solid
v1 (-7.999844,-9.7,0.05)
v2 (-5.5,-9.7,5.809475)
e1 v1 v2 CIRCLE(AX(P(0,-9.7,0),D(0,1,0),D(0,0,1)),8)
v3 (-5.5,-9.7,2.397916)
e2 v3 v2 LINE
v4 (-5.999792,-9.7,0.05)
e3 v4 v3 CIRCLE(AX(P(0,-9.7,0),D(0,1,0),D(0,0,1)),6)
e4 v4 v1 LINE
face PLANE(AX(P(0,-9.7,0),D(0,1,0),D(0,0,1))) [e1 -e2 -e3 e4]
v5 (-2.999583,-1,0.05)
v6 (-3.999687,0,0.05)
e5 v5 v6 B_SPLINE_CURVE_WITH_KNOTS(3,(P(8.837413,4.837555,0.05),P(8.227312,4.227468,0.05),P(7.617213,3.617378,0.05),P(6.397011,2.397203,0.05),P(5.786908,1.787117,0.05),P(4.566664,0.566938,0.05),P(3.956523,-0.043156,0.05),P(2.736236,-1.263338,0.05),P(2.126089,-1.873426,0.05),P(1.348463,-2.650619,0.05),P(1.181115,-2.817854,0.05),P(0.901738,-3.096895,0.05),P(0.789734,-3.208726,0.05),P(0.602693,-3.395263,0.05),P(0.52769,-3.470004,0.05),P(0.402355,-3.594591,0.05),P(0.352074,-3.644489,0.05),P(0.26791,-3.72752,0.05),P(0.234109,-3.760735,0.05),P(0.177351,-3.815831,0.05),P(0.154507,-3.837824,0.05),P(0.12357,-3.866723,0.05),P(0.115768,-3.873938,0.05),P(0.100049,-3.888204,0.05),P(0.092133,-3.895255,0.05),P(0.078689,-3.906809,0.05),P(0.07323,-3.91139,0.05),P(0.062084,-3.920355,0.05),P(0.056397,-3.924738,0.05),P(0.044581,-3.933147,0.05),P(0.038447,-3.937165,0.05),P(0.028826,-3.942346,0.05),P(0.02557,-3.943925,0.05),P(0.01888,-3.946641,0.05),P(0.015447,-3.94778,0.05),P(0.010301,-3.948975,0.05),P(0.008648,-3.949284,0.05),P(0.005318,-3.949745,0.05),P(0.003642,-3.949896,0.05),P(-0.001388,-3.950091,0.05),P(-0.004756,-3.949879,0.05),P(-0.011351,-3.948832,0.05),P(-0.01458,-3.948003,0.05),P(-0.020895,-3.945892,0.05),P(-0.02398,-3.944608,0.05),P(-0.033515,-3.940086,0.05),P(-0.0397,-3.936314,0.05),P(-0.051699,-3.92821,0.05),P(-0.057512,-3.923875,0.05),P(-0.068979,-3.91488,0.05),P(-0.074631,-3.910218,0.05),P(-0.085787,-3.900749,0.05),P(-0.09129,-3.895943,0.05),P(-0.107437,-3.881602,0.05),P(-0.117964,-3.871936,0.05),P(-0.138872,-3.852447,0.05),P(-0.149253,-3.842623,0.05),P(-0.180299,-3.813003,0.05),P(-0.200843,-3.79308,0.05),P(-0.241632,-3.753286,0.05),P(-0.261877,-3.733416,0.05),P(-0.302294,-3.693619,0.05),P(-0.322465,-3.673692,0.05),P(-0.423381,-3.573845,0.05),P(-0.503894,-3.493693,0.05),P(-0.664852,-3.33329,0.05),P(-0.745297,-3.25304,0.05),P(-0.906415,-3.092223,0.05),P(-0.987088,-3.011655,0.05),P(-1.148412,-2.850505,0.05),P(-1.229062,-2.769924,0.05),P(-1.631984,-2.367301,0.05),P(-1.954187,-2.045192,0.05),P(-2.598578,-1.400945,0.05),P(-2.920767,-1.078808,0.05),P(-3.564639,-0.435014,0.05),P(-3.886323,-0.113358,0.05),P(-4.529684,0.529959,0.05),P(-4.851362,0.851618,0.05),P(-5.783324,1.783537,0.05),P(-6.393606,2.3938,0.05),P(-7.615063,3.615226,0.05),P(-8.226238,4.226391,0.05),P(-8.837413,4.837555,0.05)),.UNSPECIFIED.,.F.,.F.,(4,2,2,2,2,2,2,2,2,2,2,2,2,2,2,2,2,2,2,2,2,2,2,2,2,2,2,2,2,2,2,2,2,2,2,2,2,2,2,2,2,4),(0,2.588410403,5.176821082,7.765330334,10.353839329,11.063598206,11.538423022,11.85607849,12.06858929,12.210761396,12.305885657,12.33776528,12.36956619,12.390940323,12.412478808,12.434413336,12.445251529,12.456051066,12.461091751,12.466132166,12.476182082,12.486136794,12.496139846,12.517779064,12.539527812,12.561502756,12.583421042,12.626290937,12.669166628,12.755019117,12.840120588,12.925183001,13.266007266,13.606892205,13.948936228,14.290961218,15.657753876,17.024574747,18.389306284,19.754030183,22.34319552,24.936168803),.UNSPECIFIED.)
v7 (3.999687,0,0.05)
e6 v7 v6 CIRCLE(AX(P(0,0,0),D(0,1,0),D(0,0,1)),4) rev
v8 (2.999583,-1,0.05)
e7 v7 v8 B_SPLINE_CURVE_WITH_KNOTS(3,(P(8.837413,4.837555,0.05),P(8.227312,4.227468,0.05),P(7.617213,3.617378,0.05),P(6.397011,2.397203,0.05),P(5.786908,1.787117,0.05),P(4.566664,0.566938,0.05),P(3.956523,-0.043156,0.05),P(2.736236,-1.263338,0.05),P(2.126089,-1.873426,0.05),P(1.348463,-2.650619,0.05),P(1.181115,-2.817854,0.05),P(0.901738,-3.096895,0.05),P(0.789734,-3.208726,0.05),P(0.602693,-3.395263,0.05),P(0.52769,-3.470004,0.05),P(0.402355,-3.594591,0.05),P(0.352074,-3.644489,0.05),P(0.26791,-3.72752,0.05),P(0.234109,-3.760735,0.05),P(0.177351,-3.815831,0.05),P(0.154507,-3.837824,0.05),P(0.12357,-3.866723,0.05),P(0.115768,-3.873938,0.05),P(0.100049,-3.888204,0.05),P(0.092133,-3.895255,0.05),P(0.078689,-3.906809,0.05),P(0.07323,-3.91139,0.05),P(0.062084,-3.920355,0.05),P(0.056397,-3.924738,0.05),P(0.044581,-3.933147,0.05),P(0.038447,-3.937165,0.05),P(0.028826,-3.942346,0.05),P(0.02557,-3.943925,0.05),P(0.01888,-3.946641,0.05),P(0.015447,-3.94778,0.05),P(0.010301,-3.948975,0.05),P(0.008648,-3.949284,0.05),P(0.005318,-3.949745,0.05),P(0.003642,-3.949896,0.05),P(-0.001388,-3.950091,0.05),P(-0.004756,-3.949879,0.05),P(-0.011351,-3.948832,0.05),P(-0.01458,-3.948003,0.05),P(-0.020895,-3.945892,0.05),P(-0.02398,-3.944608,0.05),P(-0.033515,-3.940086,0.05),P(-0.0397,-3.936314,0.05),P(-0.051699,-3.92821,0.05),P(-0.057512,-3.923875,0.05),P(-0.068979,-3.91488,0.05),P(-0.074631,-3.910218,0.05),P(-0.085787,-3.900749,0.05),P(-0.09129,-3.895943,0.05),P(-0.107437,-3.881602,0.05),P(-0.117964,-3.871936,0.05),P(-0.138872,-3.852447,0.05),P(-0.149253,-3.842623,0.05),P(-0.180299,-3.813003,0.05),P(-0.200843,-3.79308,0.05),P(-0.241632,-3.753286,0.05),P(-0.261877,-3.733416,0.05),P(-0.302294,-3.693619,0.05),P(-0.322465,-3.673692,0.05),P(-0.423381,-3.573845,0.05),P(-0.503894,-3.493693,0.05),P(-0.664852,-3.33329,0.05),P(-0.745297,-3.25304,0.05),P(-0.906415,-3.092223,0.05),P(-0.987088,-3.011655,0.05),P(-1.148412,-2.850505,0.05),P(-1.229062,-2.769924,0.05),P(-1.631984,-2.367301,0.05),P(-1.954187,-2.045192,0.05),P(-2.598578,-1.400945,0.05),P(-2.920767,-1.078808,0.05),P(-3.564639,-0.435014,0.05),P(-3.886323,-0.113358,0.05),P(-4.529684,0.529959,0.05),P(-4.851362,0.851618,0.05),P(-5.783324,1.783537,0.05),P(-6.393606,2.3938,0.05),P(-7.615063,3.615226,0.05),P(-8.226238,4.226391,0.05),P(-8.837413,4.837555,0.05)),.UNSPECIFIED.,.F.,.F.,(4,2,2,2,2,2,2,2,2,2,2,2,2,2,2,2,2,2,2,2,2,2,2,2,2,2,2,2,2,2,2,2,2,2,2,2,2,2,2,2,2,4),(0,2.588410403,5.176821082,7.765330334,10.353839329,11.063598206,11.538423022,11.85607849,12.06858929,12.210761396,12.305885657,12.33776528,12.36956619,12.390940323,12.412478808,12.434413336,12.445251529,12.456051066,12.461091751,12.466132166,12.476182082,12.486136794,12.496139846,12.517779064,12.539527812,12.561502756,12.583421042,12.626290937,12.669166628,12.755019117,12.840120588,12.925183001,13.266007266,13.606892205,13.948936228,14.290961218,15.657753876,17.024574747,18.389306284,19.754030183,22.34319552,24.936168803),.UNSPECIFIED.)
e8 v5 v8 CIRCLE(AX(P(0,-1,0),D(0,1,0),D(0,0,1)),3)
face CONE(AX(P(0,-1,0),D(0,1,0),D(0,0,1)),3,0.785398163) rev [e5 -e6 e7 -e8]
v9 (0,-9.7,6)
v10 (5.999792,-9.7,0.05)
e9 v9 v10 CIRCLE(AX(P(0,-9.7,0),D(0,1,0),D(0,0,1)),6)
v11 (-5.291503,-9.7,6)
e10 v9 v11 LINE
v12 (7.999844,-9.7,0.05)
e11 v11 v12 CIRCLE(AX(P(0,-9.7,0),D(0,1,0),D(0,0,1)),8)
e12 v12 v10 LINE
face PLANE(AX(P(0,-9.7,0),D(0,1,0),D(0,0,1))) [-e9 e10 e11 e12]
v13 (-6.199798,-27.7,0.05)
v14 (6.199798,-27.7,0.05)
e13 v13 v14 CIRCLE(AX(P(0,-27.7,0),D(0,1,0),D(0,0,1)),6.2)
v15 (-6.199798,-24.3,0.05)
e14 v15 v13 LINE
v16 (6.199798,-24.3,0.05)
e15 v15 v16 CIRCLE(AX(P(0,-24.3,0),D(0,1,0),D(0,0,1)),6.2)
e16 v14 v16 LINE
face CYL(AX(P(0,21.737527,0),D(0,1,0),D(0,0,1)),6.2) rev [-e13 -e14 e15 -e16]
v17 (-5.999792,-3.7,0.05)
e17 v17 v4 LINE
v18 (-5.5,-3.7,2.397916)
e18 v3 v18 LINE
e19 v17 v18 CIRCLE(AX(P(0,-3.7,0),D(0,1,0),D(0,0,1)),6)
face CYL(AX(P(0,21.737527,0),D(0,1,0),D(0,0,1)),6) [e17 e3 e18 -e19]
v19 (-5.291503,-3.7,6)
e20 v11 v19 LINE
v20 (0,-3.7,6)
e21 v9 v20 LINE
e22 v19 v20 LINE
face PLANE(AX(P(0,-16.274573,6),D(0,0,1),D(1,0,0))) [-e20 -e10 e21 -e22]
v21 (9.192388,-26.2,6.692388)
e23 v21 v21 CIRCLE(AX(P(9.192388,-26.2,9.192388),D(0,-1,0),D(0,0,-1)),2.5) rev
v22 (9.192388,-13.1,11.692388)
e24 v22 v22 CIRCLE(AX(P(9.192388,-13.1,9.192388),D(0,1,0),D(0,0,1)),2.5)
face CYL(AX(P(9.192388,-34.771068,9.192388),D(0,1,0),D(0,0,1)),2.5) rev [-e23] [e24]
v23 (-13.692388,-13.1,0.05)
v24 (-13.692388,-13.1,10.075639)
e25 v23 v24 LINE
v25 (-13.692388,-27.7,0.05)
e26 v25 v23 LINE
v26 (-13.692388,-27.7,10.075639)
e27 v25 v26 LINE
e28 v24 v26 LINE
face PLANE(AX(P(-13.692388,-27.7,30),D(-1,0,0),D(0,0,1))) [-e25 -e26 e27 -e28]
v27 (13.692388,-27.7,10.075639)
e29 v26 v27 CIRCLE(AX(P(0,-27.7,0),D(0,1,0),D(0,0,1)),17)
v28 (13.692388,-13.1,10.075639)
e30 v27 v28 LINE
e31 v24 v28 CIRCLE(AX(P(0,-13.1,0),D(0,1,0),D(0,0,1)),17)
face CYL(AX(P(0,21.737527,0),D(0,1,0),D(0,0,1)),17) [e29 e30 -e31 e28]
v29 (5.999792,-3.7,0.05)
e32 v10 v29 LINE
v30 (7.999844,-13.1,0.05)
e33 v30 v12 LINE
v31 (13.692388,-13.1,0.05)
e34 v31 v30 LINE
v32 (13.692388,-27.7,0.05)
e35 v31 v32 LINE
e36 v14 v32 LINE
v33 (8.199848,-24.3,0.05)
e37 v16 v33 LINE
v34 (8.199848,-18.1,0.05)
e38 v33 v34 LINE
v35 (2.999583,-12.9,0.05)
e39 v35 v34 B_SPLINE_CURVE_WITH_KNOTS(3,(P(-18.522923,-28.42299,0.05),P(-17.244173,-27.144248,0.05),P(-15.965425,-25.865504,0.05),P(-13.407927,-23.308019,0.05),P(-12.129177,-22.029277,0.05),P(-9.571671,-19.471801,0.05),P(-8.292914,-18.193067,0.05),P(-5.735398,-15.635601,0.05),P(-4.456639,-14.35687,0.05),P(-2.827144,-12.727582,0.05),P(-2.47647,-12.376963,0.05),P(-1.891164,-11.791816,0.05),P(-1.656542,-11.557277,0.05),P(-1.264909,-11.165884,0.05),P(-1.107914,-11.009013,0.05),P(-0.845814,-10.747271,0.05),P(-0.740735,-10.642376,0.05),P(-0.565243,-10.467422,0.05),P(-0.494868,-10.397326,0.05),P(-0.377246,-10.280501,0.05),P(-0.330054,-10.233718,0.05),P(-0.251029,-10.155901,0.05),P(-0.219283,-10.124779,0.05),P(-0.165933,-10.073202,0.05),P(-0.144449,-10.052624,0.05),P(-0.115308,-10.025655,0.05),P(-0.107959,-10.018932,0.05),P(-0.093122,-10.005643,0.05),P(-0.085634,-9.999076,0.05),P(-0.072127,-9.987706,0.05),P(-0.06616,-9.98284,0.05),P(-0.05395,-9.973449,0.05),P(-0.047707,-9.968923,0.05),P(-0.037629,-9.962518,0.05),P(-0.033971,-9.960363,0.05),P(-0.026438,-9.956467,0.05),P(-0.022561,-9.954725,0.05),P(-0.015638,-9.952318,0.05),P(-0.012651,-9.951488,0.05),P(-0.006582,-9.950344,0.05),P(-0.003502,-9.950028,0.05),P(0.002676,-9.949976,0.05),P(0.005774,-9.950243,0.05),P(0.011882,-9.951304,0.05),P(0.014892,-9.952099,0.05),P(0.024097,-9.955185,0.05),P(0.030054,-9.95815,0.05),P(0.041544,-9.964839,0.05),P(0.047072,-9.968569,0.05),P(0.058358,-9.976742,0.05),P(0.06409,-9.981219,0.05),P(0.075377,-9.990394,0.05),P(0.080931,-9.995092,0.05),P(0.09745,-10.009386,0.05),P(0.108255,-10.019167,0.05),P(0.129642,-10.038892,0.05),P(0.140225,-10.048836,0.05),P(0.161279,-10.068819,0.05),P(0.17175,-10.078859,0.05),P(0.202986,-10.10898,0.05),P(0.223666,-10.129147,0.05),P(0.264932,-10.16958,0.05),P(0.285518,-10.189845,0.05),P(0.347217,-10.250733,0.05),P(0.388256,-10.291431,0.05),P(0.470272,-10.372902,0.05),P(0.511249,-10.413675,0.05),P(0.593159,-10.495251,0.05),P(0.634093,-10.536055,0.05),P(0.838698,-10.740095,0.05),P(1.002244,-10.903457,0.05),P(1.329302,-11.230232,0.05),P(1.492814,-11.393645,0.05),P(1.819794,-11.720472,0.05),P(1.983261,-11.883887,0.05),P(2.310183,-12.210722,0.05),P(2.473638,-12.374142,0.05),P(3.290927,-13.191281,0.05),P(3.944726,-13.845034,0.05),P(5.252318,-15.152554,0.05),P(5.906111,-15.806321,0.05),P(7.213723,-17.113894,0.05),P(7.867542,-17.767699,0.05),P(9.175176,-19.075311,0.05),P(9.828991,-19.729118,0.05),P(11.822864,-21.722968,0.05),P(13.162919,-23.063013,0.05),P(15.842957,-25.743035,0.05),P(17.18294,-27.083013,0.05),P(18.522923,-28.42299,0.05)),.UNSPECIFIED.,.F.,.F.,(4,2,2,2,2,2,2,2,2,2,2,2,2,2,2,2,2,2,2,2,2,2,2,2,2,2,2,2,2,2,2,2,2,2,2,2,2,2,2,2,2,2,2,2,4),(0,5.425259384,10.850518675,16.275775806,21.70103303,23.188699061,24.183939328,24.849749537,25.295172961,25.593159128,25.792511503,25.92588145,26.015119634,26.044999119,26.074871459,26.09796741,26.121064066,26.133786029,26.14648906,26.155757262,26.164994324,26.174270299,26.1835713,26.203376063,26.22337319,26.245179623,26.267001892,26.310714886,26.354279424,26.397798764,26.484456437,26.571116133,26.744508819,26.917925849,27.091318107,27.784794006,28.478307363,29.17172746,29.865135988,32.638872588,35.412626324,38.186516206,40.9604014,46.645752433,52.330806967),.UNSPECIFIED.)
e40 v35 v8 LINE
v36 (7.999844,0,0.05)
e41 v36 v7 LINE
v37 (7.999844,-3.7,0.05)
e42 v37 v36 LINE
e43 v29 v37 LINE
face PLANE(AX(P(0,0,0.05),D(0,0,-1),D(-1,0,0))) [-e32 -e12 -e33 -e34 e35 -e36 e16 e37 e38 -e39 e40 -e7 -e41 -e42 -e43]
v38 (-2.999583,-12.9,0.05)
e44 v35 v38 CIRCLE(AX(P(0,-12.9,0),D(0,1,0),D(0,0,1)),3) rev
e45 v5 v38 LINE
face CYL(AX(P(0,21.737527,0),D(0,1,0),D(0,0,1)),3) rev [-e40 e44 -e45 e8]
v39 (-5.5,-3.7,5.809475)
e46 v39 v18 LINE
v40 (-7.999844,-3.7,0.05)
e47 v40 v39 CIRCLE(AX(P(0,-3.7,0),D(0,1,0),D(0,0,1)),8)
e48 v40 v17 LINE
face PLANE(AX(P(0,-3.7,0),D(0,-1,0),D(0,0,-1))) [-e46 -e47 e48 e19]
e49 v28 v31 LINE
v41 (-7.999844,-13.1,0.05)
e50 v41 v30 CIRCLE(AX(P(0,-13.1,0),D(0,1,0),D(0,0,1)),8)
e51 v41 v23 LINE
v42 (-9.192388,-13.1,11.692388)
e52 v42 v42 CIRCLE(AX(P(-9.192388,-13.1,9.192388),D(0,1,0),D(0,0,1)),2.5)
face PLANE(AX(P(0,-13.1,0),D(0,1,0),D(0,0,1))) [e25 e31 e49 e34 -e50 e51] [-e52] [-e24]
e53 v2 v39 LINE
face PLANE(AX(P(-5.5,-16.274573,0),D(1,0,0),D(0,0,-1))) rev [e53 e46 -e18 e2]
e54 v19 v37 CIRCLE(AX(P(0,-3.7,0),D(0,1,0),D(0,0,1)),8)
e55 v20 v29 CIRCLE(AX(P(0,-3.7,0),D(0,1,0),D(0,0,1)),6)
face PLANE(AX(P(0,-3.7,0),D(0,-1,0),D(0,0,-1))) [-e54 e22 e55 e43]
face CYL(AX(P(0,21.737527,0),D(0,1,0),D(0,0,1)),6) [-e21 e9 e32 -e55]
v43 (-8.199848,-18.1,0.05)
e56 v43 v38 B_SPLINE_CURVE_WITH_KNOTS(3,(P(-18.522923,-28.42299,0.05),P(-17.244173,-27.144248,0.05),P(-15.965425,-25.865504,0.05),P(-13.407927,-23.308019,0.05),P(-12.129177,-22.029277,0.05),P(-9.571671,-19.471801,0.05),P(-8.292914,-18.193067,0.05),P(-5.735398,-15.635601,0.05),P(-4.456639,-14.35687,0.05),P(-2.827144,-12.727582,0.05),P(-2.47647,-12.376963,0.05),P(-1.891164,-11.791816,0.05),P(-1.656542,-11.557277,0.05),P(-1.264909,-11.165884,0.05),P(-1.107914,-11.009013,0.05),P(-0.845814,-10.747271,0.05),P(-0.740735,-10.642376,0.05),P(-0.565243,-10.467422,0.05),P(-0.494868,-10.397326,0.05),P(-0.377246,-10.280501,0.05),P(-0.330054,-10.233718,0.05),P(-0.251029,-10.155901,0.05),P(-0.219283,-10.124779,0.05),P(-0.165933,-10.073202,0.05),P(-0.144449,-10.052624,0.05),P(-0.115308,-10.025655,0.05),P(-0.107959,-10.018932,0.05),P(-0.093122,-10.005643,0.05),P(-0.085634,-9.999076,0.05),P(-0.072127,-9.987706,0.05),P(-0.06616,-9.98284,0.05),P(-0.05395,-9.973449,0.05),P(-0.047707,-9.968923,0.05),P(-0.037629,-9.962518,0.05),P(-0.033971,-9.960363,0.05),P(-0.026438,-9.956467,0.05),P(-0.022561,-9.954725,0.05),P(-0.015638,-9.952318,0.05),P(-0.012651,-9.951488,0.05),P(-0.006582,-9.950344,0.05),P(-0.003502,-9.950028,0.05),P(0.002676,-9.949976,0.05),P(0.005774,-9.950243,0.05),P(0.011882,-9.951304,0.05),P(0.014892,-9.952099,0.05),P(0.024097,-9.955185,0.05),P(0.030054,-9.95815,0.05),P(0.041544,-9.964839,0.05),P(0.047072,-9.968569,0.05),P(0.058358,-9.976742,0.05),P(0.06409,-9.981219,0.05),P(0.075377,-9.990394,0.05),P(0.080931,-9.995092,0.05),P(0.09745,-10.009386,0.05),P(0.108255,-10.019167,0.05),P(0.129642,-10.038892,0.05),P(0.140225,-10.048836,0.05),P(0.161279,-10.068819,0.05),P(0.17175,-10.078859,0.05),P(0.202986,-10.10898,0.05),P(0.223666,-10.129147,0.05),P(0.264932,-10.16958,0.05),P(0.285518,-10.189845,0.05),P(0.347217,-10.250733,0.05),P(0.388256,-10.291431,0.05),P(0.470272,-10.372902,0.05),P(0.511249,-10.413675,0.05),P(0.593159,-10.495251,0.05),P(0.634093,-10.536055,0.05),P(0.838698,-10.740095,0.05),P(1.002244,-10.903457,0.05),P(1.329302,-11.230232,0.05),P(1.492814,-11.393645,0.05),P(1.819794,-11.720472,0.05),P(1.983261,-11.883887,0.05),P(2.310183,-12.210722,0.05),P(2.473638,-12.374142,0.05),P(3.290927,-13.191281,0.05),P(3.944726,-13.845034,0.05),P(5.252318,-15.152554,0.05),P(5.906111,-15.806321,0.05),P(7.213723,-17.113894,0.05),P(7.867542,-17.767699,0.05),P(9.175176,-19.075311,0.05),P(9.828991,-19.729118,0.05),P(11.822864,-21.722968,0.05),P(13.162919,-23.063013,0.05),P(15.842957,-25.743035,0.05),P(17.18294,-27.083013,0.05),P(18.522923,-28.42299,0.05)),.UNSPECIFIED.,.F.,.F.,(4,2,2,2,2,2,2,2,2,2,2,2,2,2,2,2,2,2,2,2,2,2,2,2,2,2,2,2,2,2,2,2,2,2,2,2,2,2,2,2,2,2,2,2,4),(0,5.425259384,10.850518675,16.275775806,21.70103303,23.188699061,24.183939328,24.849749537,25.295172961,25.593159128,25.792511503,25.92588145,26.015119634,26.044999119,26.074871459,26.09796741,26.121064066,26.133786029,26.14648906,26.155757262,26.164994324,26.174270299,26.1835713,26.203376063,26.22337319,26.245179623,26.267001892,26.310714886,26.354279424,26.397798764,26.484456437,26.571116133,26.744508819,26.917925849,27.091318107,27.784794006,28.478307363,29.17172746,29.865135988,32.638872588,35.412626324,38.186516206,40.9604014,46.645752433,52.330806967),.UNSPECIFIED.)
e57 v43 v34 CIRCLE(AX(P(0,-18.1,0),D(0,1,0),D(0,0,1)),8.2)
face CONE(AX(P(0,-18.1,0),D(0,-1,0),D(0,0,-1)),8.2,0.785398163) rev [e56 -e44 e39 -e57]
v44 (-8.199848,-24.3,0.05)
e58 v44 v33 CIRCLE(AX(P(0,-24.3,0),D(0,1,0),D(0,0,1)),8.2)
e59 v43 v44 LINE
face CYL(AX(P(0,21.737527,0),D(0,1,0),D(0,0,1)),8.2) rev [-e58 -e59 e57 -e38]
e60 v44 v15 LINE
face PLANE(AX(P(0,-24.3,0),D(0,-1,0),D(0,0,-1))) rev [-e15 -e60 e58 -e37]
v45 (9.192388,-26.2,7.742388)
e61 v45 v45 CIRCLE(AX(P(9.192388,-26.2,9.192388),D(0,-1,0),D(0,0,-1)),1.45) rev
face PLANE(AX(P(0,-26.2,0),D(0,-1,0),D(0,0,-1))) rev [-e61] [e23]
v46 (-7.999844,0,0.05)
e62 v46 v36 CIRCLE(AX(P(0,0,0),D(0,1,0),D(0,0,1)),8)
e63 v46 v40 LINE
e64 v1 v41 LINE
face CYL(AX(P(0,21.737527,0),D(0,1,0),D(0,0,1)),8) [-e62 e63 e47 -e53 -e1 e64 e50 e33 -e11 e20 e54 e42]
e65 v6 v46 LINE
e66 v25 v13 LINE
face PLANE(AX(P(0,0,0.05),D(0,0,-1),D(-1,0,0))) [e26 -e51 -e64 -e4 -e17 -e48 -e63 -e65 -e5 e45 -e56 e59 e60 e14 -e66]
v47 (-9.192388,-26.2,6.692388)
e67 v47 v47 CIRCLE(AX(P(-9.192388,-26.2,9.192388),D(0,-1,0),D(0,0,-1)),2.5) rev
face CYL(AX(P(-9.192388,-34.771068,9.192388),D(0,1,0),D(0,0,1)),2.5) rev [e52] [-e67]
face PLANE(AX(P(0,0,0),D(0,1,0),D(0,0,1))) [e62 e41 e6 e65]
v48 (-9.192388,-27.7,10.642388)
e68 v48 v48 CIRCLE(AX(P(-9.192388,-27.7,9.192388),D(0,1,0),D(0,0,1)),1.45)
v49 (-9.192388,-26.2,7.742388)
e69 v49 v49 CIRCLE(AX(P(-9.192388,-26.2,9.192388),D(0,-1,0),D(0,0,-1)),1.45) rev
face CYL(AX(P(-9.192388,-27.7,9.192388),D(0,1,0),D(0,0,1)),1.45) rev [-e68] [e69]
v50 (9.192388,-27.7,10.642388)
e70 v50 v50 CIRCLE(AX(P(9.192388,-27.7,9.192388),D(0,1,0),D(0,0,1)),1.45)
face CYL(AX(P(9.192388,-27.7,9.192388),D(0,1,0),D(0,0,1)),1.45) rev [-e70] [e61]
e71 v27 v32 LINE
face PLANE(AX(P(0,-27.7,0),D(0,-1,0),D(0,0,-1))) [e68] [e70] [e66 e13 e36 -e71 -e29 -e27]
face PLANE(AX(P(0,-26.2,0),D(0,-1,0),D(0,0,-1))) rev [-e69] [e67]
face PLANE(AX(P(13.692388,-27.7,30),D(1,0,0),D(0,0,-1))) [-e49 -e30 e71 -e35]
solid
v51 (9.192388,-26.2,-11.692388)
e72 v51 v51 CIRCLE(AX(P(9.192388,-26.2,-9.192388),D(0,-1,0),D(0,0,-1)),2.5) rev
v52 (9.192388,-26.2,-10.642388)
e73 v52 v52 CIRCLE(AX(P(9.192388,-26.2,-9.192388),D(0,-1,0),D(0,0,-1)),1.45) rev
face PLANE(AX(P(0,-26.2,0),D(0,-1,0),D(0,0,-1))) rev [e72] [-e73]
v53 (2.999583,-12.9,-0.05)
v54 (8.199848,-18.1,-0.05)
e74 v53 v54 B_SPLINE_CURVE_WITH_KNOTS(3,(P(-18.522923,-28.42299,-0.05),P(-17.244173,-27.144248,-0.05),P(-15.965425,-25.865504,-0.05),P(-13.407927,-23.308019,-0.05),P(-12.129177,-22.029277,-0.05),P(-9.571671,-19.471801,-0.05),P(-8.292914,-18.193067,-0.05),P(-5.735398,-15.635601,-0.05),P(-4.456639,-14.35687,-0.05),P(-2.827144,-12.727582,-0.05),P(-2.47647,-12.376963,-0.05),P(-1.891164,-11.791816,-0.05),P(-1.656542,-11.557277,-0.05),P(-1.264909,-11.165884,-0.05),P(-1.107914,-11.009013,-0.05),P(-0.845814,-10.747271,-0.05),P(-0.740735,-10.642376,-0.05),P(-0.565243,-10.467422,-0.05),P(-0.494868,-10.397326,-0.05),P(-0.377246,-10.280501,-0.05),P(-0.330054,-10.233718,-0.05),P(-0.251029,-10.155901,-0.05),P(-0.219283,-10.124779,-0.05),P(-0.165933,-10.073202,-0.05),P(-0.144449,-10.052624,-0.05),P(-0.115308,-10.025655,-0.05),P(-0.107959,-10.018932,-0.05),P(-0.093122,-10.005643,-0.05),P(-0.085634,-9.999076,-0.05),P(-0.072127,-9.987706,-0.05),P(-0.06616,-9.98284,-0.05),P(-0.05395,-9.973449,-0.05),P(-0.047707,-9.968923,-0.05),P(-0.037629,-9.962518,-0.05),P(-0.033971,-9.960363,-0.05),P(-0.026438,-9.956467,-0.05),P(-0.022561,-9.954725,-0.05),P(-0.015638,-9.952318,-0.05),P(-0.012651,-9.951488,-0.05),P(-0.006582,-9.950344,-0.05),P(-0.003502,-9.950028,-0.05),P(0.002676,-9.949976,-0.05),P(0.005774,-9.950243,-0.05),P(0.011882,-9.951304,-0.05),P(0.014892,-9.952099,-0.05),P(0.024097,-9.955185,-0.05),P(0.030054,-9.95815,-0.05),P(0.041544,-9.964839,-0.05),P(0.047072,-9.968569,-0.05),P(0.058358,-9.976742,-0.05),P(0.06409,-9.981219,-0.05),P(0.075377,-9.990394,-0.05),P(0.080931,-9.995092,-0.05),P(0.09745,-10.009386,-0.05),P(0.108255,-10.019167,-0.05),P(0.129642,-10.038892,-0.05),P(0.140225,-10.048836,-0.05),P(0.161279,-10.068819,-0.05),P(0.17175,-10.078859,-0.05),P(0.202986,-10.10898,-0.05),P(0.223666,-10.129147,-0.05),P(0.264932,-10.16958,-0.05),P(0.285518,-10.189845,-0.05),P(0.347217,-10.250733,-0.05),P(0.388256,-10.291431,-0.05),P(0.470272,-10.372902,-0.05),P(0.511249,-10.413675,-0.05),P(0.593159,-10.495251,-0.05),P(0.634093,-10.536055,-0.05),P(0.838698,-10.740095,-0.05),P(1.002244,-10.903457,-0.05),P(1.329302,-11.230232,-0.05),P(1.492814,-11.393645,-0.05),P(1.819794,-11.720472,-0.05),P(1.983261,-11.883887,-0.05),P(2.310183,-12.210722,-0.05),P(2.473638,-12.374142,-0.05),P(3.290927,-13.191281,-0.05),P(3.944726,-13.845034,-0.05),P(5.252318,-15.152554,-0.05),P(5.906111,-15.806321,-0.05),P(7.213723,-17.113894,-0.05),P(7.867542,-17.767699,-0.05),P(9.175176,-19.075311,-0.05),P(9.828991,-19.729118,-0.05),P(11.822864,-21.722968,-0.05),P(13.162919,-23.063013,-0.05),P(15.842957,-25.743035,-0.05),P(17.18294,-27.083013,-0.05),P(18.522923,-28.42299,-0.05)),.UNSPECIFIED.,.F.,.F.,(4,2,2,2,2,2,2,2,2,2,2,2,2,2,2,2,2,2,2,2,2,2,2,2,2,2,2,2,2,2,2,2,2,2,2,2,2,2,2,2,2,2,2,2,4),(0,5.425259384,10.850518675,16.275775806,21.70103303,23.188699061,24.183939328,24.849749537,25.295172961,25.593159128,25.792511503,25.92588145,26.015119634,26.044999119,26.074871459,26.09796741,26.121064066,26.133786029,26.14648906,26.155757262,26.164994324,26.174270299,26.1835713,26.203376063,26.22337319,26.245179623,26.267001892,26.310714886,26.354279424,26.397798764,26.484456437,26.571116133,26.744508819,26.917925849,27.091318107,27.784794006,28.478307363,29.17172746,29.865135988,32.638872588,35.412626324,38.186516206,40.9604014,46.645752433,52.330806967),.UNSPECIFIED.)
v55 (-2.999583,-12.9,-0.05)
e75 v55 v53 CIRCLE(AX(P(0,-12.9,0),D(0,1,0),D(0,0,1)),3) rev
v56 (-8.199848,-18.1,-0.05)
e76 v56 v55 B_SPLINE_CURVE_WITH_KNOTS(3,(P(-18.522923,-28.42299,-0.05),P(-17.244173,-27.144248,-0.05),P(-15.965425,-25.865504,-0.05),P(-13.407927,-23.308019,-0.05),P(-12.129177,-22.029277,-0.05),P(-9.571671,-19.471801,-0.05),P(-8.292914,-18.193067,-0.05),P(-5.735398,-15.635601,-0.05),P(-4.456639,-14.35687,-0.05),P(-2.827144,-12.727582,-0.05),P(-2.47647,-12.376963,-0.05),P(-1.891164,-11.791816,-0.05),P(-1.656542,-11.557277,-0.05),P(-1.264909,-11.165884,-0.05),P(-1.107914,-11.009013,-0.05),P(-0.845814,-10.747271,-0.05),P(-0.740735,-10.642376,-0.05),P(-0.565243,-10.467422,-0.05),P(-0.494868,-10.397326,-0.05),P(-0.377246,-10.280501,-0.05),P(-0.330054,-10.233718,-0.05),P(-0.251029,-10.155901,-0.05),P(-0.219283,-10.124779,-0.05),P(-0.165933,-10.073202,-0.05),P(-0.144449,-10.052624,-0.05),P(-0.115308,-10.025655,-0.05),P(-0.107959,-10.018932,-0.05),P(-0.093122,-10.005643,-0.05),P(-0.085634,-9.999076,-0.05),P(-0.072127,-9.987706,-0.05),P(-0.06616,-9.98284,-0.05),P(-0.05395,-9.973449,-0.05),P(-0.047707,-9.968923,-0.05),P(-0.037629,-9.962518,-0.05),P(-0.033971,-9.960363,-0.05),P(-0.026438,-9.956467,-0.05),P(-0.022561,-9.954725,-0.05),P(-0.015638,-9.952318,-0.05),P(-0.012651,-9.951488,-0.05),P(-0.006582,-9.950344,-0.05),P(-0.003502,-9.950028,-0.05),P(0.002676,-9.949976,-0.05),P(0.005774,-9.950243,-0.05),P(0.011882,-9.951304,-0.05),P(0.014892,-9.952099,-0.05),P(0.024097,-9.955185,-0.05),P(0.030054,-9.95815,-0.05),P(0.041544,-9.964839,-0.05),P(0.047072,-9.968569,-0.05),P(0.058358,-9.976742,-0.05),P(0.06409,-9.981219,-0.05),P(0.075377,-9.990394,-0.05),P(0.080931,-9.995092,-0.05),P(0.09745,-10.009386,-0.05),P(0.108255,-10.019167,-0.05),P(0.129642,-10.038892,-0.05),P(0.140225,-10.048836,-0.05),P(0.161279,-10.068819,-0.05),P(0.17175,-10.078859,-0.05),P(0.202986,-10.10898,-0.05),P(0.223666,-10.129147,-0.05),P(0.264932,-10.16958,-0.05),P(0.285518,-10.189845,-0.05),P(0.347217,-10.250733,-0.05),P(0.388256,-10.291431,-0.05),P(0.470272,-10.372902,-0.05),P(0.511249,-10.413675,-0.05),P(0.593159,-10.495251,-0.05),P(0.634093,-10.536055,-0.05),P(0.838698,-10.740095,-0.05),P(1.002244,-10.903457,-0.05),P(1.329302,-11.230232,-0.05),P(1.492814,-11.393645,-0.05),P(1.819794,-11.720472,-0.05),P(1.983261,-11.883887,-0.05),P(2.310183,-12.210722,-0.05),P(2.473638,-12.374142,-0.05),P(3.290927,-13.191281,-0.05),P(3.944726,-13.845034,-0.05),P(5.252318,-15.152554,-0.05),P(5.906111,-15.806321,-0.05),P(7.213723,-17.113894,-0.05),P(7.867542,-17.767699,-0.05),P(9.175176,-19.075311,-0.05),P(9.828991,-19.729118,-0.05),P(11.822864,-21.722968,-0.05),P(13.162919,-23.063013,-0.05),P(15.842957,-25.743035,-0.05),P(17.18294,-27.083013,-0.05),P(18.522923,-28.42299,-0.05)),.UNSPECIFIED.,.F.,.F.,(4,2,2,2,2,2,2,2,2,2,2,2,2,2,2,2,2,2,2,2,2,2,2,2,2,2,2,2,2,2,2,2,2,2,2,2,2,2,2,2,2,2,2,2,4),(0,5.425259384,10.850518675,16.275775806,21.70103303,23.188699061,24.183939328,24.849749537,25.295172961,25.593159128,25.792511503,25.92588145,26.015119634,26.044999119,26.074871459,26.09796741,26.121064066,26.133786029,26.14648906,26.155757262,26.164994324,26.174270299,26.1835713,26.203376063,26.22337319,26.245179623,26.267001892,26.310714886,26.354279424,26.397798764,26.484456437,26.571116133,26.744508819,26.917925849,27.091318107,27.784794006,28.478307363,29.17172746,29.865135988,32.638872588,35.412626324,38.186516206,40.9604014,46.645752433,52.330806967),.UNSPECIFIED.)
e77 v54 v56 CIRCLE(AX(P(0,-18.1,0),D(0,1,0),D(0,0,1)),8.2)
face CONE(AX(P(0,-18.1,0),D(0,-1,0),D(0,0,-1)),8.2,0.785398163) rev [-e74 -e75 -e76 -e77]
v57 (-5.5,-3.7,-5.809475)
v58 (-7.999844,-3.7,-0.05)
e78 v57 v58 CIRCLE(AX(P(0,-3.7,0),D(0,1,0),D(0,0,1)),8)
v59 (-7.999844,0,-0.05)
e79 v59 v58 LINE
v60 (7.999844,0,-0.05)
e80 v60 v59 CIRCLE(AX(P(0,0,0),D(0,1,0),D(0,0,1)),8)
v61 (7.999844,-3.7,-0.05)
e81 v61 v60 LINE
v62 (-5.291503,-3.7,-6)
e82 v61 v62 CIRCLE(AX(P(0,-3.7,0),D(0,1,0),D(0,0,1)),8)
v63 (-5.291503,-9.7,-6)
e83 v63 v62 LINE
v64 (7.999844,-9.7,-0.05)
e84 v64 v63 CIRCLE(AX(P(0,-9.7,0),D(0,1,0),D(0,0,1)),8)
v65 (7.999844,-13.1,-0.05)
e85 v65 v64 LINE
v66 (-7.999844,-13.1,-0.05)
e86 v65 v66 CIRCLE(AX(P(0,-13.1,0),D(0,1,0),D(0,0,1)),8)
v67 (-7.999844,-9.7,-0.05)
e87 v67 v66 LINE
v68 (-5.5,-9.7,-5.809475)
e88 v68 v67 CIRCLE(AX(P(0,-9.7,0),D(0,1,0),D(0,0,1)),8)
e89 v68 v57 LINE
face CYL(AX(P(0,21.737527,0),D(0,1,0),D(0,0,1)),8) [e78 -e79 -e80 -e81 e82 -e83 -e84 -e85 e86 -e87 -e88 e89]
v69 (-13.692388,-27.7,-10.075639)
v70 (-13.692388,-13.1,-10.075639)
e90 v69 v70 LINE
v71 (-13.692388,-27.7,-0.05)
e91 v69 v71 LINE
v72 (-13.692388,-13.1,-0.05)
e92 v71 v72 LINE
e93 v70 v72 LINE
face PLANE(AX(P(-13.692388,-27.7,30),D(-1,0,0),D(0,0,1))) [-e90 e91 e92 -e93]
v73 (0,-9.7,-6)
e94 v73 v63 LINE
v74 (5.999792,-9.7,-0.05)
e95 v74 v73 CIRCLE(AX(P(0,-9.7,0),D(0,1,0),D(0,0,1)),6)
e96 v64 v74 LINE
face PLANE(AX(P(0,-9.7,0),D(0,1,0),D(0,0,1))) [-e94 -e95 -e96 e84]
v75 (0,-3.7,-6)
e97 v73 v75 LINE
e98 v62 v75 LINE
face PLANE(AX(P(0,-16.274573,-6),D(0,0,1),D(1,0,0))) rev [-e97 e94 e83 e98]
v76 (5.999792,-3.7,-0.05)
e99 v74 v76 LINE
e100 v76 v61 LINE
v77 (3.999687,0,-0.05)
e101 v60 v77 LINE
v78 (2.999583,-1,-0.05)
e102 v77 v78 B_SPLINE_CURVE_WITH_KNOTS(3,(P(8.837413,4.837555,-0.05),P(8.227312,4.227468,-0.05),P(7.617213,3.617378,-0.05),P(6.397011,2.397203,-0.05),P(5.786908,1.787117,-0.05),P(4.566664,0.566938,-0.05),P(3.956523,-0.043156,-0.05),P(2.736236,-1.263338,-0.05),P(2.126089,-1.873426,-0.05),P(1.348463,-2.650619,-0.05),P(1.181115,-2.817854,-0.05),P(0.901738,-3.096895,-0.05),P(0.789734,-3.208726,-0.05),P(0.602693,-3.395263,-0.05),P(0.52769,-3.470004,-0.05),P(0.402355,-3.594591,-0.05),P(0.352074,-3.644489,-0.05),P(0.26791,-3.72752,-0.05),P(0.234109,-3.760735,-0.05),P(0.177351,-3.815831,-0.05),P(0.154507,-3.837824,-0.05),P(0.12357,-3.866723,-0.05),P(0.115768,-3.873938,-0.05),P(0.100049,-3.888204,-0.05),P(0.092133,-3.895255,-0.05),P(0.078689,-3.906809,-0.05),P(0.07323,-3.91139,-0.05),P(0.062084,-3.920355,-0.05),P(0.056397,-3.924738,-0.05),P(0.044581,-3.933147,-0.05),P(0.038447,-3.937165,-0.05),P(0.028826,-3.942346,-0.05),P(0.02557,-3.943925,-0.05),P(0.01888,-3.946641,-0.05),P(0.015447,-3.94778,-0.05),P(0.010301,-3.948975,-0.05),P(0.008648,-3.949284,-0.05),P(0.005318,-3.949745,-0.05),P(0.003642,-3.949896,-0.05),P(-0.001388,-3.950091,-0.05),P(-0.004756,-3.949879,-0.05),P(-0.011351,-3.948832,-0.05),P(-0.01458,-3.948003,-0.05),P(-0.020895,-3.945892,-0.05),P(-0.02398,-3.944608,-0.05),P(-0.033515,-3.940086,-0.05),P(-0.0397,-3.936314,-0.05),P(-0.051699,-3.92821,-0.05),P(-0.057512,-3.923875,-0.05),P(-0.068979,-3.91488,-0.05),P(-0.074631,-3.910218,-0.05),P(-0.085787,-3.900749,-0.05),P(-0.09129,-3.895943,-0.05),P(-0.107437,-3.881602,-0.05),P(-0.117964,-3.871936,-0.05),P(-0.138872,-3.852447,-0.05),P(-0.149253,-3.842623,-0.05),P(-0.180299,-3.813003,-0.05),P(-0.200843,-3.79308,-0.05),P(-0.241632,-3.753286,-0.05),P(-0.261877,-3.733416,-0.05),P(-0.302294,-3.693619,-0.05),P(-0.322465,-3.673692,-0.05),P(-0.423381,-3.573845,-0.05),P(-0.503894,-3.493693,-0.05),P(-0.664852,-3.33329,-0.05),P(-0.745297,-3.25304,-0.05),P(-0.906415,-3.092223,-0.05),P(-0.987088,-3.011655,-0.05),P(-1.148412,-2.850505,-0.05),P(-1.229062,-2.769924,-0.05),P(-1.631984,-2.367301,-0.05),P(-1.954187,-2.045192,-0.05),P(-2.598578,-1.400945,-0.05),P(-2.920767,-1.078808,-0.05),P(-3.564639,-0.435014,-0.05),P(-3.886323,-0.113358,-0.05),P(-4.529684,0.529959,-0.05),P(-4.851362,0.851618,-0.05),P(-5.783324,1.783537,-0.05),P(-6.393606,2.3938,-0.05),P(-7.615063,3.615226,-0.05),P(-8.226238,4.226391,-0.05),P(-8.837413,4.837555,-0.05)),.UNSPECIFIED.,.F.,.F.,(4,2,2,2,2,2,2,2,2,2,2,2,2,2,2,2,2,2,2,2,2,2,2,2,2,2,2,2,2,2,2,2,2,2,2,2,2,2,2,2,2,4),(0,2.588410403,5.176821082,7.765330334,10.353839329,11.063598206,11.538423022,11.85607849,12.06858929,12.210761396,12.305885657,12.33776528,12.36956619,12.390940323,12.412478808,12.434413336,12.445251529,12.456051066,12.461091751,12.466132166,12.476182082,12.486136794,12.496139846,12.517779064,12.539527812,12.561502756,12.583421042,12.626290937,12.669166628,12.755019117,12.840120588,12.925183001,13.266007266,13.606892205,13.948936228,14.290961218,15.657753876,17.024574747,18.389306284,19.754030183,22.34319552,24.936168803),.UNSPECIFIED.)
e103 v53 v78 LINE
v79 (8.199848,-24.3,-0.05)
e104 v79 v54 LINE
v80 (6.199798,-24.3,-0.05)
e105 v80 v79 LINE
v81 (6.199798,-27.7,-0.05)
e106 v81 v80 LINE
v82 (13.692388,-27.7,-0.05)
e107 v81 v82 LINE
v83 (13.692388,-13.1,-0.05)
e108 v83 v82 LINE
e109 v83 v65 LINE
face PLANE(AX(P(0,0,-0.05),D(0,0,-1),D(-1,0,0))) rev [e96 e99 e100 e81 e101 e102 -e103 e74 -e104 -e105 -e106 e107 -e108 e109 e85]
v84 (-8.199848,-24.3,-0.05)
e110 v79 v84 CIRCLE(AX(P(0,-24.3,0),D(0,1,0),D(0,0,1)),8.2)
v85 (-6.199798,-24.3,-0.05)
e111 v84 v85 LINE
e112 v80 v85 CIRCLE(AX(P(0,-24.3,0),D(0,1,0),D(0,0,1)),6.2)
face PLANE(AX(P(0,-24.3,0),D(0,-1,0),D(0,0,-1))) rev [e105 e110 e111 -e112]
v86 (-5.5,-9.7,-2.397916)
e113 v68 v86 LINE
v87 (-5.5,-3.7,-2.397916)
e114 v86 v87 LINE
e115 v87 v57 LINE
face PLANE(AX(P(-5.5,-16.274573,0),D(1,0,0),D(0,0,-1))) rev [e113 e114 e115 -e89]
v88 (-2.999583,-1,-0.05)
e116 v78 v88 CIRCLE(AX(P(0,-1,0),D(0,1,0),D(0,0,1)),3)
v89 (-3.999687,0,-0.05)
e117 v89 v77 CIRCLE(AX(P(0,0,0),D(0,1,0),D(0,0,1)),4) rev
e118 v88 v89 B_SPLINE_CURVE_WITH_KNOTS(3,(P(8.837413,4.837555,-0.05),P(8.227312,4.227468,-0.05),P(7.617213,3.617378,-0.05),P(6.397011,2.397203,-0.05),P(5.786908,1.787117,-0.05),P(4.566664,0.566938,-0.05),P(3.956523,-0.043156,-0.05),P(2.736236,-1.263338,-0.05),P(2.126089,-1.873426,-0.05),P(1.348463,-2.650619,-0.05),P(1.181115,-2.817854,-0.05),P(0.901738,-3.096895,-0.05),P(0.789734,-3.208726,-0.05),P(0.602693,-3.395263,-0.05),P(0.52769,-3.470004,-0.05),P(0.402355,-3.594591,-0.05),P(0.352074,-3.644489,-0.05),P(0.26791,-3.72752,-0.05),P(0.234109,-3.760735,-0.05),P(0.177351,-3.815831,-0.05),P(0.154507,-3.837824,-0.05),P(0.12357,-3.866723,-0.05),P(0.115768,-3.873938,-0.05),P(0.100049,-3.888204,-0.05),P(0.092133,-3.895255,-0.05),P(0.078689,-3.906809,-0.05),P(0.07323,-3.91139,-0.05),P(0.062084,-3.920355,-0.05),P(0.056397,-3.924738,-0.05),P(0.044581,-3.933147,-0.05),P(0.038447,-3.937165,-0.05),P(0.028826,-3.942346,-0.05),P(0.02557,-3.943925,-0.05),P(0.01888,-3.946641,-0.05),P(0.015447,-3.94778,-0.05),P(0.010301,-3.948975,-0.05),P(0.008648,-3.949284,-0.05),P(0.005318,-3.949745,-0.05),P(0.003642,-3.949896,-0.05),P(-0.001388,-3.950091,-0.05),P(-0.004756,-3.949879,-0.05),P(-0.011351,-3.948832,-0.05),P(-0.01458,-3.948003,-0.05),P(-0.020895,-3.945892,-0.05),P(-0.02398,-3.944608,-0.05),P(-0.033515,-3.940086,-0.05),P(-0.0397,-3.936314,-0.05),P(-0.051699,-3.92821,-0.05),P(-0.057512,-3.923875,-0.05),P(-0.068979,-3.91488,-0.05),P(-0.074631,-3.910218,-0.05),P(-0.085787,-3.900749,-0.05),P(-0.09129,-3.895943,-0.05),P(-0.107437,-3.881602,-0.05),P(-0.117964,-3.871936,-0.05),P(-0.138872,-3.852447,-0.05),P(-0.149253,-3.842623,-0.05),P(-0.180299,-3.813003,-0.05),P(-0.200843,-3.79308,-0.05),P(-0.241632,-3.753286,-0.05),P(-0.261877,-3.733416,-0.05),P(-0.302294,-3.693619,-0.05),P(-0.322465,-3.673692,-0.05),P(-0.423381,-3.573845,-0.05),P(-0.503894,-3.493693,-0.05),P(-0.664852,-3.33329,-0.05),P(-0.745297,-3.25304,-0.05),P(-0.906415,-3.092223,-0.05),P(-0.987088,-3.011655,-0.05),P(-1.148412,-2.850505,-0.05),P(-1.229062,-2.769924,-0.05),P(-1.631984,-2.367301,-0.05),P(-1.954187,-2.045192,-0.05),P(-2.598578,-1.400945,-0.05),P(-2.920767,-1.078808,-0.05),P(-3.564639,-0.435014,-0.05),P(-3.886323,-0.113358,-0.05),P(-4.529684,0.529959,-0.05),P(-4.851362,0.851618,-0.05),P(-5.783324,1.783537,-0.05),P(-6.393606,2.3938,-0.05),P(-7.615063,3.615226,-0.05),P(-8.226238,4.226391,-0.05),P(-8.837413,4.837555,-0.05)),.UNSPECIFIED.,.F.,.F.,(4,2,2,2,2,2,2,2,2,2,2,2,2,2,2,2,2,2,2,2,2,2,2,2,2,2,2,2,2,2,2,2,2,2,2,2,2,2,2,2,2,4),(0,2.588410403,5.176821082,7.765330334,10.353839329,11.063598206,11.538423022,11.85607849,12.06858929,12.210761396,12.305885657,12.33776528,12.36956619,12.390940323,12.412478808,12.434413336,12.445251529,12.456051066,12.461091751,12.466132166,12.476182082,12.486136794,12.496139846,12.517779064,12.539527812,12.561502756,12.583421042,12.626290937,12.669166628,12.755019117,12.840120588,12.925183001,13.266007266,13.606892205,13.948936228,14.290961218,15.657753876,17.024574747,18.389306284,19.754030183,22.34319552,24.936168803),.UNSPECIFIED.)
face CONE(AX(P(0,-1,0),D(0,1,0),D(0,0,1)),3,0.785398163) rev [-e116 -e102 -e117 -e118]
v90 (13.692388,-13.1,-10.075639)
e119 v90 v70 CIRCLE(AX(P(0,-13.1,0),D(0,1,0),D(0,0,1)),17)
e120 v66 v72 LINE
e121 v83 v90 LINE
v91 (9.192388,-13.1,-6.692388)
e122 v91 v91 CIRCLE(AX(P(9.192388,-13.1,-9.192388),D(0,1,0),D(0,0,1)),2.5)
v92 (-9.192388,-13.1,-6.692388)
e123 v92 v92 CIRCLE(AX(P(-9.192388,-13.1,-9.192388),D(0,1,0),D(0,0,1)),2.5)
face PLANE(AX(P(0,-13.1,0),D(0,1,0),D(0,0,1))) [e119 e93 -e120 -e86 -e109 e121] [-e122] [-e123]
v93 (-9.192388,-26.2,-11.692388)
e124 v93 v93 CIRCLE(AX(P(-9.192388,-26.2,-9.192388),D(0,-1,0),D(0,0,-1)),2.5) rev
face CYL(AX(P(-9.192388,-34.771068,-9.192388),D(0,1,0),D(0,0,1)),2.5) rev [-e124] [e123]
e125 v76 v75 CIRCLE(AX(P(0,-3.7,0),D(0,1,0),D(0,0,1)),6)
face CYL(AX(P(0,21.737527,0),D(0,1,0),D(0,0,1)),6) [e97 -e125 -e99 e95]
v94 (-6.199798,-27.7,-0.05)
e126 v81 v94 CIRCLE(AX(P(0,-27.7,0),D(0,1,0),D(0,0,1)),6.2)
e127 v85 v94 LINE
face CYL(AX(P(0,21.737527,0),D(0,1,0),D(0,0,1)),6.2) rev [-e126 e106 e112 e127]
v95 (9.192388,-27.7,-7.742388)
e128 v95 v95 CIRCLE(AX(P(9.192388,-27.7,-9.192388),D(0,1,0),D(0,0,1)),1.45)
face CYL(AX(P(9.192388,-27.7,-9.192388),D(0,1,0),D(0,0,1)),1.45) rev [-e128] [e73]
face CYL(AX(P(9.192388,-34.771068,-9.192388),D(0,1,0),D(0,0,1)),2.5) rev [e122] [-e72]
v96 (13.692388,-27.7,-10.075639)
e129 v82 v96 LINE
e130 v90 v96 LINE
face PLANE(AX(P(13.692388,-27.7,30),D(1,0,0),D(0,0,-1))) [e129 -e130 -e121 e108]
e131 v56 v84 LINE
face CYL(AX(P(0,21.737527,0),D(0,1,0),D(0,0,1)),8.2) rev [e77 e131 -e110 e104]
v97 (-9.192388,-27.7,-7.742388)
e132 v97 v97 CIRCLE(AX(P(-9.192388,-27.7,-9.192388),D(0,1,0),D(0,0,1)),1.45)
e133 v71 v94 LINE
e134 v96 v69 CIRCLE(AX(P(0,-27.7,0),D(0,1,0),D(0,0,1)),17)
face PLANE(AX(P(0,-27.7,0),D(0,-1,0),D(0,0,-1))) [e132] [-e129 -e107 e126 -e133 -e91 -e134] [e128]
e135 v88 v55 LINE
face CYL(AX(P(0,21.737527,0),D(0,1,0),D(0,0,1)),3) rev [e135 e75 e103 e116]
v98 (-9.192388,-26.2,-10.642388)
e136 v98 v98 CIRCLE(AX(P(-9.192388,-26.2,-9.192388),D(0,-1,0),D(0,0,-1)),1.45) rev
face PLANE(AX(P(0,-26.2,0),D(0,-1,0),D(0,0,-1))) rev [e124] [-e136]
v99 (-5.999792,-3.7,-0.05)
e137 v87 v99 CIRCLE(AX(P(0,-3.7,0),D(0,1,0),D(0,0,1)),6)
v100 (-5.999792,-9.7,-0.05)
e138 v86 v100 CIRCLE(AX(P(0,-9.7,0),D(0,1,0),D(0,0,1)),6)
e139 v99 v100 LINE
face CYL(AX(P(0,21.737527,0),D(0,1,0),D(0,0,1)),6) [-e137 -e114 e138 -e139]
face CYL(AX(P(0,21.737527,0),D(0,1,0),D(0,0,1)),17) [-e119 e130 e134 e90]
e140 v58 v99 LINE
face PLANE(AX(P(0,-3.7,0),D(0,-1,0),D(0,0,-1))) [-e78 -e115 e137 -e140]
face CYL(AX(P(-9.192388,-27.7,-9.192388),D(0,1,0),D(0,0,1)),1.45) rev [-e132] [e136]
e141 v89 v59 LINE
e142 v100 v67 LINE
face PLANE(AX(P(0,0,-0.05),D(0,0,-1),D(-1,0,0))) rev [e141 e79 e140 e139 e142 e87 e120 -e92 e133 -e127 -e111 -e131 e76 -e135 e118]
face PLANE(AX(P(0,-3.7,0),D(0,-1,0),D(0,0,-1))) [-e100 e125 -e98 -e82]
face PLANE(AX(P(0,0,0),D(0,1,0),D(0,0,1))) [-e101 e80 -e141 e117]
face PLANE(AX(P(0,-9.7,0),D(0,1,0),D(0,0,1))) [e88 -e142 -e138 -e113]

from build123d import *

# Parameters (mm, degrees)
SKETCH1_W               = 8.8
SKETCH1_H               = 6.2
CUT_EXTRUDE2_DEPTH      = 29.12756655
CUT_EXTRUDE2_DEPTH_BACK = 29.12756655
SKETCH4_R               = 1.45
SKETCH4_3_R             = 2.5
SKETCH4_3_R_2           = 1.45
CUT_EXTRUDE3_DEPTH      = 13.1
CHAMFER1_SIZE           = 1
BOSS_EXTRUDE1_START     = 6
BOSS_EXTRUDE1_DEPTH     = 6
CHAMFER2_SIZE           = 5.2
SKETCH2_W               = 100
SKETCH2_H               = 100
CUT_EXTRUDE1_DEPTH      = 0.05
CUT_EXTRUDE4_START      = -14.6
CUT_EXTRUDE4_DEPTH      = 14.6


# Read off the part's stored shape, not the designer's step: Cut-Extrude4
with BuildPart() as part:
    # Sketch1 → Revolve1 (revolve)
    with BuildSketch(Plane.XY, mode=Mode.PRIVATE) as revolve1_sk:
        Polygon((-3, -13.1), (-3, 0), (-8, 0), (-8, -3.7), (-6, -3.7), (-6, -9.7), (-8, -9.7), (-8, -13.1), align=None)
        Polygon((-3, -18.1), (-3, -13.1), (-8, -13.1), (-17, -13.1), (-17, -18.1), (-8.2, -18.1), align=None)
        with Locations((-12.6, -21.2)):
            Rectangle(SKETCH1_W, SKETCH1_H)
        Polygon((-6.2, -24.3), (-8.2, -24.3), (-17, -24.3), (-17, -27.7), (-6.2, -27.7), align=None)
    revolve(revolve1_sk.sketch.rotate(Axis((0, 21.737527327, 0), (0, -1, 0)), 270), axis=Axis((0, 21.737527327, 0), (0, -1, 0)))

    # Sketch4 → Cut-Extrude2 (cut, two sides: drawn at the far end of the back side and taken through both)
    with BuildSketch(Plane(origin=(0, -13.1, 0), x_dir=(1, 0, 0), z_dir=(0, 1, 0)).offset(-CUT_EXTRUDE2_DEPTH_BACK)):
        with Locations(Location((-9.192388155, 9.192388155, 0), (0, 0, 270))):
            Circle(SKETCH4_R)
        with Locations(Location((9.192388155, 9.192388155, 0), (0, 0, 270))):
            Circle(SKETCH4_R)
        with Locations(Location((9.192388155, -9.192388155, 0), (0, 0, 270))):
            Circle(SKETCH4_R)
        with Locations(Location((-9.192388155, -9.192388155, 0), (0, 0, 270))):
            Circle(SKETCH4_R)
    extrude(amount=CUT_EXTRUDE2_DEPTH + CUT_EXTRUDE2_DEPTH_BACK, mode=Mode.SUBTRACT)

    # Sketch4<3> → Cut-Extrude3 (cut)
    # profile 1 of 5: a face of its own
    with BuildSketch(Plane(origin=(0, -13.1, 0), x_dir=(1, 0, 0), z_dir=(0, 1, 0))):
        with Locations(Location((9.192388155, 9.192388155, 0), (0, 0, 270))):
            Circle(SKETCH4_3_R)
        with Locations(Location((9.192388155, 9.192388155, 0), (0, 0, 270))):
            Circle(SKETCH4_3_R_2, mode=Mode.SUBTRACT)
    # profile 2 of 5: a face of its own
    with BuildSketch(Plane(origin=(0, -13.1, 0), x_dir=(1, 0, 0), z_dir=(0, 1, 0))):
        with Locations(Location((9.192388155, -9.192388155, 0), (0, 0, 270))):
            Circle(SKETCH4_3_R)
        with Locations(Location((9.192388155, -9.192388155, 0), (0, 0, 270))):
            Circle(SKETCH4_3_R_2, mode=Mode.SUBTRACT)
    # profile 3 of 5: a face of its own
    with BuildSketch(Plane(origin=(0, -13.1, 0), x_dir=(1, 0, 0), z_dir=(0, 1, 0))):
        with Locations(Location((-9.192388155, -9.192388155, 0), (0, 0, 270))):
            Circle(SKETCH4_3_R)
        with Locations(Location((-9.192388155, -9.192388155, 0), (0, 0, 270))):
            Circle(SKETCH4_3_R_2, mode=Mode.SUBTRACT)
    # profile 4 of 5: a face of its own
    with BuildSketch(Plane(origin=(0, -13.1, 0), x_dir=(1, 0, 0), z_dir=(0, 1, 0))):
        with Locations(Location((-9.192388155, 9.192388155, 0), (0, 0, 270))):
            Circle(SKETCH4_3_R_2)
    # profile 5 of 5: a face of its own
    with BuildSketch(Plane(origin=(0, -13.1, 0), x_dir=(1, 0, 0), z_dir=(0, 1, 0))):
        with Locations(Location((-9.192388155, 9.192388155, 0), (0, 0, 270))):
            Circle(SKETCH4_3_R)
    extrude(amount=-CUT_EXTRUDE3_DEPTH, mode=Mode.SUBTRACT)

    # Chamfer1
    chamfer1_edges = [part.edges().sort_by_distance(p)[0] for p in [
        (0, 0, -3),
    ]]
    chamfer(chamfer1_edges, length=CHAMFER1_SIZE)

    # Sketch5 → Boss-Extrude1 (add)
    with BuildSketch(Plane.XZ.offset(3.7).offset(BOSS_EXTRUDE1_START)):
        with BuildLine():
            Line((0, 6), (-5.291502622, 6))
            ThreePointArc((-5.291502622, 6), (-5.39659218, 5.905657698), (-5.5, 5.809475019))
            Line((-5.5, 5.809475019), (-5.5, 2.397915762))
            ThreePointArc((-5.5, 2.397915762), (-3.287286528, 5.019337335), (0, 6))
        make_face()
        with BuildLine():
            Line((-5.5, -2.397915762), (-5.5, -5.809475019))
            ThreePointArc((-5.5, -5.809475019), (-5.39659218, -5.905657698), (-5.291502622, -6))
            Line((-5.291502622, -6), (0, -6))
            ThreePointArc((0, -6), (-3.287286528, -5.019337335), (-5.5, -2.397915762))
        make_face()
    extrude(amount=-BOSS_EXTRUDE1_DEPTH)

    # Chamfer2
    chamfer2_edges = [part.edges().sort_by_distance(p)[0] for p in [
        (0, -18.1, -3),
    ]]
    chamfer(chamfer2_edges, length=CHAMFER2_SIZE - 0.0001)  # a hair under: the kernel refuses the full size

    # Sketch2 → Cut-Extrude1 (cut, symmetric)
    with BuildSketch(Plane.XY):
        Rectangle(SKETCH2_W, SKETCH2_H)
    extrude(amount=CUT_EXTRUDE1_DEPTH, both=True, mode=Mode.SUBTRACT)


with BuildPart() as cut_extrude1_piece_1:
    # of the separate pieces the step leaves, piece 1, a body of its own (cut_extrude1_pieces)
    add(part.part.solids().sort_by_distance((-2.999583304, -12.9001, -0.05))[0])


with BuildPart() as cut_extrude1_piece_2:
    # of the separate pieces the step leaves, piece 2, a body of its own (cut_extrude1_pieces)
    add(part.part.solids().sort_by_distance((2.999583304, -12.9001, 0.05))[0])


with BuildPart() as cut_extrude4_tool:
    # Cut-Extrude4 outline → Cut-Extrude4 (new body)
    with BuildSketch(Plane(origin=(0, -13.1, 0), x_dir=(1, 0, 0), z_dir=(0, 1, 0)).offset(CUT_EXTRUDE4_START)):
        with BuildLine():
            ThreePointArc((16.99992647, 0.05), (16.144129117, 5.326076892), (13.692388155, 10.075639265))
            Line((13.692388155, 10.075639265), (13.692388155, 0.05))
            Line((13.692388155, 0.05), (16.99992647, 0.05))
        make_face()
        with BuildLine():
            Line((-13.692388155, 0.05), (-13.692388155, 10.075639265))
            ThreePointArc((-13.692388155, 10.075639265), (-16.144129117, 5.326076892), (-16.99992647, 0.05))
            Line((-16.99992647, 0.05), (-13.692388155, 0.05))
        make_face()
        with BuildLine():
            Line((13.692388155, -0.05), (13.692388155, -10.075639265))
            ThreePointArc((13.692388155, -10.075639265), (16.144129117, -5.326076892), (16.99992647, -0.05))
            Line((16.99992647, -0.05), (13.692388155, -0.05))
        make_face()
        with BuildLine():
            Line((-13.692388155, -10.075639265), (-13.692388155, -0.05))
            Line((-13.692388155, -0.05), (-16.99992647, -0.05))
            ThreePointArc((-16.99992647, -0.05), (-16.144129117, -5.326076892), (-13.692388155, -10.075639265))
        make_face()
    extrude(amount=CUT_EXTRUDE4_DEPTH)


with BuildPart() as cut_extrude1_piece_1_1:
    add(cut_extrude1_piece_1.part)

    # Cut-Extrude4: cut by cut_extrude4_tool
    add(cut_extrude4_tool.part, mode=Mode.SUBTRACT)


with BuildPart() as cut_extrude1_piece_2_1:
    add(cut_extrude1_piece_2.part)

    # Cut-Extrude4: cut by cut_extrude4_tool
    add(cut_extrude4_tool.part, mode=Mode.SUBTRACT)


solid = Compound([cut_extrude1_piece_1_1.part, cut_extrude1_piece_2_1.part])
